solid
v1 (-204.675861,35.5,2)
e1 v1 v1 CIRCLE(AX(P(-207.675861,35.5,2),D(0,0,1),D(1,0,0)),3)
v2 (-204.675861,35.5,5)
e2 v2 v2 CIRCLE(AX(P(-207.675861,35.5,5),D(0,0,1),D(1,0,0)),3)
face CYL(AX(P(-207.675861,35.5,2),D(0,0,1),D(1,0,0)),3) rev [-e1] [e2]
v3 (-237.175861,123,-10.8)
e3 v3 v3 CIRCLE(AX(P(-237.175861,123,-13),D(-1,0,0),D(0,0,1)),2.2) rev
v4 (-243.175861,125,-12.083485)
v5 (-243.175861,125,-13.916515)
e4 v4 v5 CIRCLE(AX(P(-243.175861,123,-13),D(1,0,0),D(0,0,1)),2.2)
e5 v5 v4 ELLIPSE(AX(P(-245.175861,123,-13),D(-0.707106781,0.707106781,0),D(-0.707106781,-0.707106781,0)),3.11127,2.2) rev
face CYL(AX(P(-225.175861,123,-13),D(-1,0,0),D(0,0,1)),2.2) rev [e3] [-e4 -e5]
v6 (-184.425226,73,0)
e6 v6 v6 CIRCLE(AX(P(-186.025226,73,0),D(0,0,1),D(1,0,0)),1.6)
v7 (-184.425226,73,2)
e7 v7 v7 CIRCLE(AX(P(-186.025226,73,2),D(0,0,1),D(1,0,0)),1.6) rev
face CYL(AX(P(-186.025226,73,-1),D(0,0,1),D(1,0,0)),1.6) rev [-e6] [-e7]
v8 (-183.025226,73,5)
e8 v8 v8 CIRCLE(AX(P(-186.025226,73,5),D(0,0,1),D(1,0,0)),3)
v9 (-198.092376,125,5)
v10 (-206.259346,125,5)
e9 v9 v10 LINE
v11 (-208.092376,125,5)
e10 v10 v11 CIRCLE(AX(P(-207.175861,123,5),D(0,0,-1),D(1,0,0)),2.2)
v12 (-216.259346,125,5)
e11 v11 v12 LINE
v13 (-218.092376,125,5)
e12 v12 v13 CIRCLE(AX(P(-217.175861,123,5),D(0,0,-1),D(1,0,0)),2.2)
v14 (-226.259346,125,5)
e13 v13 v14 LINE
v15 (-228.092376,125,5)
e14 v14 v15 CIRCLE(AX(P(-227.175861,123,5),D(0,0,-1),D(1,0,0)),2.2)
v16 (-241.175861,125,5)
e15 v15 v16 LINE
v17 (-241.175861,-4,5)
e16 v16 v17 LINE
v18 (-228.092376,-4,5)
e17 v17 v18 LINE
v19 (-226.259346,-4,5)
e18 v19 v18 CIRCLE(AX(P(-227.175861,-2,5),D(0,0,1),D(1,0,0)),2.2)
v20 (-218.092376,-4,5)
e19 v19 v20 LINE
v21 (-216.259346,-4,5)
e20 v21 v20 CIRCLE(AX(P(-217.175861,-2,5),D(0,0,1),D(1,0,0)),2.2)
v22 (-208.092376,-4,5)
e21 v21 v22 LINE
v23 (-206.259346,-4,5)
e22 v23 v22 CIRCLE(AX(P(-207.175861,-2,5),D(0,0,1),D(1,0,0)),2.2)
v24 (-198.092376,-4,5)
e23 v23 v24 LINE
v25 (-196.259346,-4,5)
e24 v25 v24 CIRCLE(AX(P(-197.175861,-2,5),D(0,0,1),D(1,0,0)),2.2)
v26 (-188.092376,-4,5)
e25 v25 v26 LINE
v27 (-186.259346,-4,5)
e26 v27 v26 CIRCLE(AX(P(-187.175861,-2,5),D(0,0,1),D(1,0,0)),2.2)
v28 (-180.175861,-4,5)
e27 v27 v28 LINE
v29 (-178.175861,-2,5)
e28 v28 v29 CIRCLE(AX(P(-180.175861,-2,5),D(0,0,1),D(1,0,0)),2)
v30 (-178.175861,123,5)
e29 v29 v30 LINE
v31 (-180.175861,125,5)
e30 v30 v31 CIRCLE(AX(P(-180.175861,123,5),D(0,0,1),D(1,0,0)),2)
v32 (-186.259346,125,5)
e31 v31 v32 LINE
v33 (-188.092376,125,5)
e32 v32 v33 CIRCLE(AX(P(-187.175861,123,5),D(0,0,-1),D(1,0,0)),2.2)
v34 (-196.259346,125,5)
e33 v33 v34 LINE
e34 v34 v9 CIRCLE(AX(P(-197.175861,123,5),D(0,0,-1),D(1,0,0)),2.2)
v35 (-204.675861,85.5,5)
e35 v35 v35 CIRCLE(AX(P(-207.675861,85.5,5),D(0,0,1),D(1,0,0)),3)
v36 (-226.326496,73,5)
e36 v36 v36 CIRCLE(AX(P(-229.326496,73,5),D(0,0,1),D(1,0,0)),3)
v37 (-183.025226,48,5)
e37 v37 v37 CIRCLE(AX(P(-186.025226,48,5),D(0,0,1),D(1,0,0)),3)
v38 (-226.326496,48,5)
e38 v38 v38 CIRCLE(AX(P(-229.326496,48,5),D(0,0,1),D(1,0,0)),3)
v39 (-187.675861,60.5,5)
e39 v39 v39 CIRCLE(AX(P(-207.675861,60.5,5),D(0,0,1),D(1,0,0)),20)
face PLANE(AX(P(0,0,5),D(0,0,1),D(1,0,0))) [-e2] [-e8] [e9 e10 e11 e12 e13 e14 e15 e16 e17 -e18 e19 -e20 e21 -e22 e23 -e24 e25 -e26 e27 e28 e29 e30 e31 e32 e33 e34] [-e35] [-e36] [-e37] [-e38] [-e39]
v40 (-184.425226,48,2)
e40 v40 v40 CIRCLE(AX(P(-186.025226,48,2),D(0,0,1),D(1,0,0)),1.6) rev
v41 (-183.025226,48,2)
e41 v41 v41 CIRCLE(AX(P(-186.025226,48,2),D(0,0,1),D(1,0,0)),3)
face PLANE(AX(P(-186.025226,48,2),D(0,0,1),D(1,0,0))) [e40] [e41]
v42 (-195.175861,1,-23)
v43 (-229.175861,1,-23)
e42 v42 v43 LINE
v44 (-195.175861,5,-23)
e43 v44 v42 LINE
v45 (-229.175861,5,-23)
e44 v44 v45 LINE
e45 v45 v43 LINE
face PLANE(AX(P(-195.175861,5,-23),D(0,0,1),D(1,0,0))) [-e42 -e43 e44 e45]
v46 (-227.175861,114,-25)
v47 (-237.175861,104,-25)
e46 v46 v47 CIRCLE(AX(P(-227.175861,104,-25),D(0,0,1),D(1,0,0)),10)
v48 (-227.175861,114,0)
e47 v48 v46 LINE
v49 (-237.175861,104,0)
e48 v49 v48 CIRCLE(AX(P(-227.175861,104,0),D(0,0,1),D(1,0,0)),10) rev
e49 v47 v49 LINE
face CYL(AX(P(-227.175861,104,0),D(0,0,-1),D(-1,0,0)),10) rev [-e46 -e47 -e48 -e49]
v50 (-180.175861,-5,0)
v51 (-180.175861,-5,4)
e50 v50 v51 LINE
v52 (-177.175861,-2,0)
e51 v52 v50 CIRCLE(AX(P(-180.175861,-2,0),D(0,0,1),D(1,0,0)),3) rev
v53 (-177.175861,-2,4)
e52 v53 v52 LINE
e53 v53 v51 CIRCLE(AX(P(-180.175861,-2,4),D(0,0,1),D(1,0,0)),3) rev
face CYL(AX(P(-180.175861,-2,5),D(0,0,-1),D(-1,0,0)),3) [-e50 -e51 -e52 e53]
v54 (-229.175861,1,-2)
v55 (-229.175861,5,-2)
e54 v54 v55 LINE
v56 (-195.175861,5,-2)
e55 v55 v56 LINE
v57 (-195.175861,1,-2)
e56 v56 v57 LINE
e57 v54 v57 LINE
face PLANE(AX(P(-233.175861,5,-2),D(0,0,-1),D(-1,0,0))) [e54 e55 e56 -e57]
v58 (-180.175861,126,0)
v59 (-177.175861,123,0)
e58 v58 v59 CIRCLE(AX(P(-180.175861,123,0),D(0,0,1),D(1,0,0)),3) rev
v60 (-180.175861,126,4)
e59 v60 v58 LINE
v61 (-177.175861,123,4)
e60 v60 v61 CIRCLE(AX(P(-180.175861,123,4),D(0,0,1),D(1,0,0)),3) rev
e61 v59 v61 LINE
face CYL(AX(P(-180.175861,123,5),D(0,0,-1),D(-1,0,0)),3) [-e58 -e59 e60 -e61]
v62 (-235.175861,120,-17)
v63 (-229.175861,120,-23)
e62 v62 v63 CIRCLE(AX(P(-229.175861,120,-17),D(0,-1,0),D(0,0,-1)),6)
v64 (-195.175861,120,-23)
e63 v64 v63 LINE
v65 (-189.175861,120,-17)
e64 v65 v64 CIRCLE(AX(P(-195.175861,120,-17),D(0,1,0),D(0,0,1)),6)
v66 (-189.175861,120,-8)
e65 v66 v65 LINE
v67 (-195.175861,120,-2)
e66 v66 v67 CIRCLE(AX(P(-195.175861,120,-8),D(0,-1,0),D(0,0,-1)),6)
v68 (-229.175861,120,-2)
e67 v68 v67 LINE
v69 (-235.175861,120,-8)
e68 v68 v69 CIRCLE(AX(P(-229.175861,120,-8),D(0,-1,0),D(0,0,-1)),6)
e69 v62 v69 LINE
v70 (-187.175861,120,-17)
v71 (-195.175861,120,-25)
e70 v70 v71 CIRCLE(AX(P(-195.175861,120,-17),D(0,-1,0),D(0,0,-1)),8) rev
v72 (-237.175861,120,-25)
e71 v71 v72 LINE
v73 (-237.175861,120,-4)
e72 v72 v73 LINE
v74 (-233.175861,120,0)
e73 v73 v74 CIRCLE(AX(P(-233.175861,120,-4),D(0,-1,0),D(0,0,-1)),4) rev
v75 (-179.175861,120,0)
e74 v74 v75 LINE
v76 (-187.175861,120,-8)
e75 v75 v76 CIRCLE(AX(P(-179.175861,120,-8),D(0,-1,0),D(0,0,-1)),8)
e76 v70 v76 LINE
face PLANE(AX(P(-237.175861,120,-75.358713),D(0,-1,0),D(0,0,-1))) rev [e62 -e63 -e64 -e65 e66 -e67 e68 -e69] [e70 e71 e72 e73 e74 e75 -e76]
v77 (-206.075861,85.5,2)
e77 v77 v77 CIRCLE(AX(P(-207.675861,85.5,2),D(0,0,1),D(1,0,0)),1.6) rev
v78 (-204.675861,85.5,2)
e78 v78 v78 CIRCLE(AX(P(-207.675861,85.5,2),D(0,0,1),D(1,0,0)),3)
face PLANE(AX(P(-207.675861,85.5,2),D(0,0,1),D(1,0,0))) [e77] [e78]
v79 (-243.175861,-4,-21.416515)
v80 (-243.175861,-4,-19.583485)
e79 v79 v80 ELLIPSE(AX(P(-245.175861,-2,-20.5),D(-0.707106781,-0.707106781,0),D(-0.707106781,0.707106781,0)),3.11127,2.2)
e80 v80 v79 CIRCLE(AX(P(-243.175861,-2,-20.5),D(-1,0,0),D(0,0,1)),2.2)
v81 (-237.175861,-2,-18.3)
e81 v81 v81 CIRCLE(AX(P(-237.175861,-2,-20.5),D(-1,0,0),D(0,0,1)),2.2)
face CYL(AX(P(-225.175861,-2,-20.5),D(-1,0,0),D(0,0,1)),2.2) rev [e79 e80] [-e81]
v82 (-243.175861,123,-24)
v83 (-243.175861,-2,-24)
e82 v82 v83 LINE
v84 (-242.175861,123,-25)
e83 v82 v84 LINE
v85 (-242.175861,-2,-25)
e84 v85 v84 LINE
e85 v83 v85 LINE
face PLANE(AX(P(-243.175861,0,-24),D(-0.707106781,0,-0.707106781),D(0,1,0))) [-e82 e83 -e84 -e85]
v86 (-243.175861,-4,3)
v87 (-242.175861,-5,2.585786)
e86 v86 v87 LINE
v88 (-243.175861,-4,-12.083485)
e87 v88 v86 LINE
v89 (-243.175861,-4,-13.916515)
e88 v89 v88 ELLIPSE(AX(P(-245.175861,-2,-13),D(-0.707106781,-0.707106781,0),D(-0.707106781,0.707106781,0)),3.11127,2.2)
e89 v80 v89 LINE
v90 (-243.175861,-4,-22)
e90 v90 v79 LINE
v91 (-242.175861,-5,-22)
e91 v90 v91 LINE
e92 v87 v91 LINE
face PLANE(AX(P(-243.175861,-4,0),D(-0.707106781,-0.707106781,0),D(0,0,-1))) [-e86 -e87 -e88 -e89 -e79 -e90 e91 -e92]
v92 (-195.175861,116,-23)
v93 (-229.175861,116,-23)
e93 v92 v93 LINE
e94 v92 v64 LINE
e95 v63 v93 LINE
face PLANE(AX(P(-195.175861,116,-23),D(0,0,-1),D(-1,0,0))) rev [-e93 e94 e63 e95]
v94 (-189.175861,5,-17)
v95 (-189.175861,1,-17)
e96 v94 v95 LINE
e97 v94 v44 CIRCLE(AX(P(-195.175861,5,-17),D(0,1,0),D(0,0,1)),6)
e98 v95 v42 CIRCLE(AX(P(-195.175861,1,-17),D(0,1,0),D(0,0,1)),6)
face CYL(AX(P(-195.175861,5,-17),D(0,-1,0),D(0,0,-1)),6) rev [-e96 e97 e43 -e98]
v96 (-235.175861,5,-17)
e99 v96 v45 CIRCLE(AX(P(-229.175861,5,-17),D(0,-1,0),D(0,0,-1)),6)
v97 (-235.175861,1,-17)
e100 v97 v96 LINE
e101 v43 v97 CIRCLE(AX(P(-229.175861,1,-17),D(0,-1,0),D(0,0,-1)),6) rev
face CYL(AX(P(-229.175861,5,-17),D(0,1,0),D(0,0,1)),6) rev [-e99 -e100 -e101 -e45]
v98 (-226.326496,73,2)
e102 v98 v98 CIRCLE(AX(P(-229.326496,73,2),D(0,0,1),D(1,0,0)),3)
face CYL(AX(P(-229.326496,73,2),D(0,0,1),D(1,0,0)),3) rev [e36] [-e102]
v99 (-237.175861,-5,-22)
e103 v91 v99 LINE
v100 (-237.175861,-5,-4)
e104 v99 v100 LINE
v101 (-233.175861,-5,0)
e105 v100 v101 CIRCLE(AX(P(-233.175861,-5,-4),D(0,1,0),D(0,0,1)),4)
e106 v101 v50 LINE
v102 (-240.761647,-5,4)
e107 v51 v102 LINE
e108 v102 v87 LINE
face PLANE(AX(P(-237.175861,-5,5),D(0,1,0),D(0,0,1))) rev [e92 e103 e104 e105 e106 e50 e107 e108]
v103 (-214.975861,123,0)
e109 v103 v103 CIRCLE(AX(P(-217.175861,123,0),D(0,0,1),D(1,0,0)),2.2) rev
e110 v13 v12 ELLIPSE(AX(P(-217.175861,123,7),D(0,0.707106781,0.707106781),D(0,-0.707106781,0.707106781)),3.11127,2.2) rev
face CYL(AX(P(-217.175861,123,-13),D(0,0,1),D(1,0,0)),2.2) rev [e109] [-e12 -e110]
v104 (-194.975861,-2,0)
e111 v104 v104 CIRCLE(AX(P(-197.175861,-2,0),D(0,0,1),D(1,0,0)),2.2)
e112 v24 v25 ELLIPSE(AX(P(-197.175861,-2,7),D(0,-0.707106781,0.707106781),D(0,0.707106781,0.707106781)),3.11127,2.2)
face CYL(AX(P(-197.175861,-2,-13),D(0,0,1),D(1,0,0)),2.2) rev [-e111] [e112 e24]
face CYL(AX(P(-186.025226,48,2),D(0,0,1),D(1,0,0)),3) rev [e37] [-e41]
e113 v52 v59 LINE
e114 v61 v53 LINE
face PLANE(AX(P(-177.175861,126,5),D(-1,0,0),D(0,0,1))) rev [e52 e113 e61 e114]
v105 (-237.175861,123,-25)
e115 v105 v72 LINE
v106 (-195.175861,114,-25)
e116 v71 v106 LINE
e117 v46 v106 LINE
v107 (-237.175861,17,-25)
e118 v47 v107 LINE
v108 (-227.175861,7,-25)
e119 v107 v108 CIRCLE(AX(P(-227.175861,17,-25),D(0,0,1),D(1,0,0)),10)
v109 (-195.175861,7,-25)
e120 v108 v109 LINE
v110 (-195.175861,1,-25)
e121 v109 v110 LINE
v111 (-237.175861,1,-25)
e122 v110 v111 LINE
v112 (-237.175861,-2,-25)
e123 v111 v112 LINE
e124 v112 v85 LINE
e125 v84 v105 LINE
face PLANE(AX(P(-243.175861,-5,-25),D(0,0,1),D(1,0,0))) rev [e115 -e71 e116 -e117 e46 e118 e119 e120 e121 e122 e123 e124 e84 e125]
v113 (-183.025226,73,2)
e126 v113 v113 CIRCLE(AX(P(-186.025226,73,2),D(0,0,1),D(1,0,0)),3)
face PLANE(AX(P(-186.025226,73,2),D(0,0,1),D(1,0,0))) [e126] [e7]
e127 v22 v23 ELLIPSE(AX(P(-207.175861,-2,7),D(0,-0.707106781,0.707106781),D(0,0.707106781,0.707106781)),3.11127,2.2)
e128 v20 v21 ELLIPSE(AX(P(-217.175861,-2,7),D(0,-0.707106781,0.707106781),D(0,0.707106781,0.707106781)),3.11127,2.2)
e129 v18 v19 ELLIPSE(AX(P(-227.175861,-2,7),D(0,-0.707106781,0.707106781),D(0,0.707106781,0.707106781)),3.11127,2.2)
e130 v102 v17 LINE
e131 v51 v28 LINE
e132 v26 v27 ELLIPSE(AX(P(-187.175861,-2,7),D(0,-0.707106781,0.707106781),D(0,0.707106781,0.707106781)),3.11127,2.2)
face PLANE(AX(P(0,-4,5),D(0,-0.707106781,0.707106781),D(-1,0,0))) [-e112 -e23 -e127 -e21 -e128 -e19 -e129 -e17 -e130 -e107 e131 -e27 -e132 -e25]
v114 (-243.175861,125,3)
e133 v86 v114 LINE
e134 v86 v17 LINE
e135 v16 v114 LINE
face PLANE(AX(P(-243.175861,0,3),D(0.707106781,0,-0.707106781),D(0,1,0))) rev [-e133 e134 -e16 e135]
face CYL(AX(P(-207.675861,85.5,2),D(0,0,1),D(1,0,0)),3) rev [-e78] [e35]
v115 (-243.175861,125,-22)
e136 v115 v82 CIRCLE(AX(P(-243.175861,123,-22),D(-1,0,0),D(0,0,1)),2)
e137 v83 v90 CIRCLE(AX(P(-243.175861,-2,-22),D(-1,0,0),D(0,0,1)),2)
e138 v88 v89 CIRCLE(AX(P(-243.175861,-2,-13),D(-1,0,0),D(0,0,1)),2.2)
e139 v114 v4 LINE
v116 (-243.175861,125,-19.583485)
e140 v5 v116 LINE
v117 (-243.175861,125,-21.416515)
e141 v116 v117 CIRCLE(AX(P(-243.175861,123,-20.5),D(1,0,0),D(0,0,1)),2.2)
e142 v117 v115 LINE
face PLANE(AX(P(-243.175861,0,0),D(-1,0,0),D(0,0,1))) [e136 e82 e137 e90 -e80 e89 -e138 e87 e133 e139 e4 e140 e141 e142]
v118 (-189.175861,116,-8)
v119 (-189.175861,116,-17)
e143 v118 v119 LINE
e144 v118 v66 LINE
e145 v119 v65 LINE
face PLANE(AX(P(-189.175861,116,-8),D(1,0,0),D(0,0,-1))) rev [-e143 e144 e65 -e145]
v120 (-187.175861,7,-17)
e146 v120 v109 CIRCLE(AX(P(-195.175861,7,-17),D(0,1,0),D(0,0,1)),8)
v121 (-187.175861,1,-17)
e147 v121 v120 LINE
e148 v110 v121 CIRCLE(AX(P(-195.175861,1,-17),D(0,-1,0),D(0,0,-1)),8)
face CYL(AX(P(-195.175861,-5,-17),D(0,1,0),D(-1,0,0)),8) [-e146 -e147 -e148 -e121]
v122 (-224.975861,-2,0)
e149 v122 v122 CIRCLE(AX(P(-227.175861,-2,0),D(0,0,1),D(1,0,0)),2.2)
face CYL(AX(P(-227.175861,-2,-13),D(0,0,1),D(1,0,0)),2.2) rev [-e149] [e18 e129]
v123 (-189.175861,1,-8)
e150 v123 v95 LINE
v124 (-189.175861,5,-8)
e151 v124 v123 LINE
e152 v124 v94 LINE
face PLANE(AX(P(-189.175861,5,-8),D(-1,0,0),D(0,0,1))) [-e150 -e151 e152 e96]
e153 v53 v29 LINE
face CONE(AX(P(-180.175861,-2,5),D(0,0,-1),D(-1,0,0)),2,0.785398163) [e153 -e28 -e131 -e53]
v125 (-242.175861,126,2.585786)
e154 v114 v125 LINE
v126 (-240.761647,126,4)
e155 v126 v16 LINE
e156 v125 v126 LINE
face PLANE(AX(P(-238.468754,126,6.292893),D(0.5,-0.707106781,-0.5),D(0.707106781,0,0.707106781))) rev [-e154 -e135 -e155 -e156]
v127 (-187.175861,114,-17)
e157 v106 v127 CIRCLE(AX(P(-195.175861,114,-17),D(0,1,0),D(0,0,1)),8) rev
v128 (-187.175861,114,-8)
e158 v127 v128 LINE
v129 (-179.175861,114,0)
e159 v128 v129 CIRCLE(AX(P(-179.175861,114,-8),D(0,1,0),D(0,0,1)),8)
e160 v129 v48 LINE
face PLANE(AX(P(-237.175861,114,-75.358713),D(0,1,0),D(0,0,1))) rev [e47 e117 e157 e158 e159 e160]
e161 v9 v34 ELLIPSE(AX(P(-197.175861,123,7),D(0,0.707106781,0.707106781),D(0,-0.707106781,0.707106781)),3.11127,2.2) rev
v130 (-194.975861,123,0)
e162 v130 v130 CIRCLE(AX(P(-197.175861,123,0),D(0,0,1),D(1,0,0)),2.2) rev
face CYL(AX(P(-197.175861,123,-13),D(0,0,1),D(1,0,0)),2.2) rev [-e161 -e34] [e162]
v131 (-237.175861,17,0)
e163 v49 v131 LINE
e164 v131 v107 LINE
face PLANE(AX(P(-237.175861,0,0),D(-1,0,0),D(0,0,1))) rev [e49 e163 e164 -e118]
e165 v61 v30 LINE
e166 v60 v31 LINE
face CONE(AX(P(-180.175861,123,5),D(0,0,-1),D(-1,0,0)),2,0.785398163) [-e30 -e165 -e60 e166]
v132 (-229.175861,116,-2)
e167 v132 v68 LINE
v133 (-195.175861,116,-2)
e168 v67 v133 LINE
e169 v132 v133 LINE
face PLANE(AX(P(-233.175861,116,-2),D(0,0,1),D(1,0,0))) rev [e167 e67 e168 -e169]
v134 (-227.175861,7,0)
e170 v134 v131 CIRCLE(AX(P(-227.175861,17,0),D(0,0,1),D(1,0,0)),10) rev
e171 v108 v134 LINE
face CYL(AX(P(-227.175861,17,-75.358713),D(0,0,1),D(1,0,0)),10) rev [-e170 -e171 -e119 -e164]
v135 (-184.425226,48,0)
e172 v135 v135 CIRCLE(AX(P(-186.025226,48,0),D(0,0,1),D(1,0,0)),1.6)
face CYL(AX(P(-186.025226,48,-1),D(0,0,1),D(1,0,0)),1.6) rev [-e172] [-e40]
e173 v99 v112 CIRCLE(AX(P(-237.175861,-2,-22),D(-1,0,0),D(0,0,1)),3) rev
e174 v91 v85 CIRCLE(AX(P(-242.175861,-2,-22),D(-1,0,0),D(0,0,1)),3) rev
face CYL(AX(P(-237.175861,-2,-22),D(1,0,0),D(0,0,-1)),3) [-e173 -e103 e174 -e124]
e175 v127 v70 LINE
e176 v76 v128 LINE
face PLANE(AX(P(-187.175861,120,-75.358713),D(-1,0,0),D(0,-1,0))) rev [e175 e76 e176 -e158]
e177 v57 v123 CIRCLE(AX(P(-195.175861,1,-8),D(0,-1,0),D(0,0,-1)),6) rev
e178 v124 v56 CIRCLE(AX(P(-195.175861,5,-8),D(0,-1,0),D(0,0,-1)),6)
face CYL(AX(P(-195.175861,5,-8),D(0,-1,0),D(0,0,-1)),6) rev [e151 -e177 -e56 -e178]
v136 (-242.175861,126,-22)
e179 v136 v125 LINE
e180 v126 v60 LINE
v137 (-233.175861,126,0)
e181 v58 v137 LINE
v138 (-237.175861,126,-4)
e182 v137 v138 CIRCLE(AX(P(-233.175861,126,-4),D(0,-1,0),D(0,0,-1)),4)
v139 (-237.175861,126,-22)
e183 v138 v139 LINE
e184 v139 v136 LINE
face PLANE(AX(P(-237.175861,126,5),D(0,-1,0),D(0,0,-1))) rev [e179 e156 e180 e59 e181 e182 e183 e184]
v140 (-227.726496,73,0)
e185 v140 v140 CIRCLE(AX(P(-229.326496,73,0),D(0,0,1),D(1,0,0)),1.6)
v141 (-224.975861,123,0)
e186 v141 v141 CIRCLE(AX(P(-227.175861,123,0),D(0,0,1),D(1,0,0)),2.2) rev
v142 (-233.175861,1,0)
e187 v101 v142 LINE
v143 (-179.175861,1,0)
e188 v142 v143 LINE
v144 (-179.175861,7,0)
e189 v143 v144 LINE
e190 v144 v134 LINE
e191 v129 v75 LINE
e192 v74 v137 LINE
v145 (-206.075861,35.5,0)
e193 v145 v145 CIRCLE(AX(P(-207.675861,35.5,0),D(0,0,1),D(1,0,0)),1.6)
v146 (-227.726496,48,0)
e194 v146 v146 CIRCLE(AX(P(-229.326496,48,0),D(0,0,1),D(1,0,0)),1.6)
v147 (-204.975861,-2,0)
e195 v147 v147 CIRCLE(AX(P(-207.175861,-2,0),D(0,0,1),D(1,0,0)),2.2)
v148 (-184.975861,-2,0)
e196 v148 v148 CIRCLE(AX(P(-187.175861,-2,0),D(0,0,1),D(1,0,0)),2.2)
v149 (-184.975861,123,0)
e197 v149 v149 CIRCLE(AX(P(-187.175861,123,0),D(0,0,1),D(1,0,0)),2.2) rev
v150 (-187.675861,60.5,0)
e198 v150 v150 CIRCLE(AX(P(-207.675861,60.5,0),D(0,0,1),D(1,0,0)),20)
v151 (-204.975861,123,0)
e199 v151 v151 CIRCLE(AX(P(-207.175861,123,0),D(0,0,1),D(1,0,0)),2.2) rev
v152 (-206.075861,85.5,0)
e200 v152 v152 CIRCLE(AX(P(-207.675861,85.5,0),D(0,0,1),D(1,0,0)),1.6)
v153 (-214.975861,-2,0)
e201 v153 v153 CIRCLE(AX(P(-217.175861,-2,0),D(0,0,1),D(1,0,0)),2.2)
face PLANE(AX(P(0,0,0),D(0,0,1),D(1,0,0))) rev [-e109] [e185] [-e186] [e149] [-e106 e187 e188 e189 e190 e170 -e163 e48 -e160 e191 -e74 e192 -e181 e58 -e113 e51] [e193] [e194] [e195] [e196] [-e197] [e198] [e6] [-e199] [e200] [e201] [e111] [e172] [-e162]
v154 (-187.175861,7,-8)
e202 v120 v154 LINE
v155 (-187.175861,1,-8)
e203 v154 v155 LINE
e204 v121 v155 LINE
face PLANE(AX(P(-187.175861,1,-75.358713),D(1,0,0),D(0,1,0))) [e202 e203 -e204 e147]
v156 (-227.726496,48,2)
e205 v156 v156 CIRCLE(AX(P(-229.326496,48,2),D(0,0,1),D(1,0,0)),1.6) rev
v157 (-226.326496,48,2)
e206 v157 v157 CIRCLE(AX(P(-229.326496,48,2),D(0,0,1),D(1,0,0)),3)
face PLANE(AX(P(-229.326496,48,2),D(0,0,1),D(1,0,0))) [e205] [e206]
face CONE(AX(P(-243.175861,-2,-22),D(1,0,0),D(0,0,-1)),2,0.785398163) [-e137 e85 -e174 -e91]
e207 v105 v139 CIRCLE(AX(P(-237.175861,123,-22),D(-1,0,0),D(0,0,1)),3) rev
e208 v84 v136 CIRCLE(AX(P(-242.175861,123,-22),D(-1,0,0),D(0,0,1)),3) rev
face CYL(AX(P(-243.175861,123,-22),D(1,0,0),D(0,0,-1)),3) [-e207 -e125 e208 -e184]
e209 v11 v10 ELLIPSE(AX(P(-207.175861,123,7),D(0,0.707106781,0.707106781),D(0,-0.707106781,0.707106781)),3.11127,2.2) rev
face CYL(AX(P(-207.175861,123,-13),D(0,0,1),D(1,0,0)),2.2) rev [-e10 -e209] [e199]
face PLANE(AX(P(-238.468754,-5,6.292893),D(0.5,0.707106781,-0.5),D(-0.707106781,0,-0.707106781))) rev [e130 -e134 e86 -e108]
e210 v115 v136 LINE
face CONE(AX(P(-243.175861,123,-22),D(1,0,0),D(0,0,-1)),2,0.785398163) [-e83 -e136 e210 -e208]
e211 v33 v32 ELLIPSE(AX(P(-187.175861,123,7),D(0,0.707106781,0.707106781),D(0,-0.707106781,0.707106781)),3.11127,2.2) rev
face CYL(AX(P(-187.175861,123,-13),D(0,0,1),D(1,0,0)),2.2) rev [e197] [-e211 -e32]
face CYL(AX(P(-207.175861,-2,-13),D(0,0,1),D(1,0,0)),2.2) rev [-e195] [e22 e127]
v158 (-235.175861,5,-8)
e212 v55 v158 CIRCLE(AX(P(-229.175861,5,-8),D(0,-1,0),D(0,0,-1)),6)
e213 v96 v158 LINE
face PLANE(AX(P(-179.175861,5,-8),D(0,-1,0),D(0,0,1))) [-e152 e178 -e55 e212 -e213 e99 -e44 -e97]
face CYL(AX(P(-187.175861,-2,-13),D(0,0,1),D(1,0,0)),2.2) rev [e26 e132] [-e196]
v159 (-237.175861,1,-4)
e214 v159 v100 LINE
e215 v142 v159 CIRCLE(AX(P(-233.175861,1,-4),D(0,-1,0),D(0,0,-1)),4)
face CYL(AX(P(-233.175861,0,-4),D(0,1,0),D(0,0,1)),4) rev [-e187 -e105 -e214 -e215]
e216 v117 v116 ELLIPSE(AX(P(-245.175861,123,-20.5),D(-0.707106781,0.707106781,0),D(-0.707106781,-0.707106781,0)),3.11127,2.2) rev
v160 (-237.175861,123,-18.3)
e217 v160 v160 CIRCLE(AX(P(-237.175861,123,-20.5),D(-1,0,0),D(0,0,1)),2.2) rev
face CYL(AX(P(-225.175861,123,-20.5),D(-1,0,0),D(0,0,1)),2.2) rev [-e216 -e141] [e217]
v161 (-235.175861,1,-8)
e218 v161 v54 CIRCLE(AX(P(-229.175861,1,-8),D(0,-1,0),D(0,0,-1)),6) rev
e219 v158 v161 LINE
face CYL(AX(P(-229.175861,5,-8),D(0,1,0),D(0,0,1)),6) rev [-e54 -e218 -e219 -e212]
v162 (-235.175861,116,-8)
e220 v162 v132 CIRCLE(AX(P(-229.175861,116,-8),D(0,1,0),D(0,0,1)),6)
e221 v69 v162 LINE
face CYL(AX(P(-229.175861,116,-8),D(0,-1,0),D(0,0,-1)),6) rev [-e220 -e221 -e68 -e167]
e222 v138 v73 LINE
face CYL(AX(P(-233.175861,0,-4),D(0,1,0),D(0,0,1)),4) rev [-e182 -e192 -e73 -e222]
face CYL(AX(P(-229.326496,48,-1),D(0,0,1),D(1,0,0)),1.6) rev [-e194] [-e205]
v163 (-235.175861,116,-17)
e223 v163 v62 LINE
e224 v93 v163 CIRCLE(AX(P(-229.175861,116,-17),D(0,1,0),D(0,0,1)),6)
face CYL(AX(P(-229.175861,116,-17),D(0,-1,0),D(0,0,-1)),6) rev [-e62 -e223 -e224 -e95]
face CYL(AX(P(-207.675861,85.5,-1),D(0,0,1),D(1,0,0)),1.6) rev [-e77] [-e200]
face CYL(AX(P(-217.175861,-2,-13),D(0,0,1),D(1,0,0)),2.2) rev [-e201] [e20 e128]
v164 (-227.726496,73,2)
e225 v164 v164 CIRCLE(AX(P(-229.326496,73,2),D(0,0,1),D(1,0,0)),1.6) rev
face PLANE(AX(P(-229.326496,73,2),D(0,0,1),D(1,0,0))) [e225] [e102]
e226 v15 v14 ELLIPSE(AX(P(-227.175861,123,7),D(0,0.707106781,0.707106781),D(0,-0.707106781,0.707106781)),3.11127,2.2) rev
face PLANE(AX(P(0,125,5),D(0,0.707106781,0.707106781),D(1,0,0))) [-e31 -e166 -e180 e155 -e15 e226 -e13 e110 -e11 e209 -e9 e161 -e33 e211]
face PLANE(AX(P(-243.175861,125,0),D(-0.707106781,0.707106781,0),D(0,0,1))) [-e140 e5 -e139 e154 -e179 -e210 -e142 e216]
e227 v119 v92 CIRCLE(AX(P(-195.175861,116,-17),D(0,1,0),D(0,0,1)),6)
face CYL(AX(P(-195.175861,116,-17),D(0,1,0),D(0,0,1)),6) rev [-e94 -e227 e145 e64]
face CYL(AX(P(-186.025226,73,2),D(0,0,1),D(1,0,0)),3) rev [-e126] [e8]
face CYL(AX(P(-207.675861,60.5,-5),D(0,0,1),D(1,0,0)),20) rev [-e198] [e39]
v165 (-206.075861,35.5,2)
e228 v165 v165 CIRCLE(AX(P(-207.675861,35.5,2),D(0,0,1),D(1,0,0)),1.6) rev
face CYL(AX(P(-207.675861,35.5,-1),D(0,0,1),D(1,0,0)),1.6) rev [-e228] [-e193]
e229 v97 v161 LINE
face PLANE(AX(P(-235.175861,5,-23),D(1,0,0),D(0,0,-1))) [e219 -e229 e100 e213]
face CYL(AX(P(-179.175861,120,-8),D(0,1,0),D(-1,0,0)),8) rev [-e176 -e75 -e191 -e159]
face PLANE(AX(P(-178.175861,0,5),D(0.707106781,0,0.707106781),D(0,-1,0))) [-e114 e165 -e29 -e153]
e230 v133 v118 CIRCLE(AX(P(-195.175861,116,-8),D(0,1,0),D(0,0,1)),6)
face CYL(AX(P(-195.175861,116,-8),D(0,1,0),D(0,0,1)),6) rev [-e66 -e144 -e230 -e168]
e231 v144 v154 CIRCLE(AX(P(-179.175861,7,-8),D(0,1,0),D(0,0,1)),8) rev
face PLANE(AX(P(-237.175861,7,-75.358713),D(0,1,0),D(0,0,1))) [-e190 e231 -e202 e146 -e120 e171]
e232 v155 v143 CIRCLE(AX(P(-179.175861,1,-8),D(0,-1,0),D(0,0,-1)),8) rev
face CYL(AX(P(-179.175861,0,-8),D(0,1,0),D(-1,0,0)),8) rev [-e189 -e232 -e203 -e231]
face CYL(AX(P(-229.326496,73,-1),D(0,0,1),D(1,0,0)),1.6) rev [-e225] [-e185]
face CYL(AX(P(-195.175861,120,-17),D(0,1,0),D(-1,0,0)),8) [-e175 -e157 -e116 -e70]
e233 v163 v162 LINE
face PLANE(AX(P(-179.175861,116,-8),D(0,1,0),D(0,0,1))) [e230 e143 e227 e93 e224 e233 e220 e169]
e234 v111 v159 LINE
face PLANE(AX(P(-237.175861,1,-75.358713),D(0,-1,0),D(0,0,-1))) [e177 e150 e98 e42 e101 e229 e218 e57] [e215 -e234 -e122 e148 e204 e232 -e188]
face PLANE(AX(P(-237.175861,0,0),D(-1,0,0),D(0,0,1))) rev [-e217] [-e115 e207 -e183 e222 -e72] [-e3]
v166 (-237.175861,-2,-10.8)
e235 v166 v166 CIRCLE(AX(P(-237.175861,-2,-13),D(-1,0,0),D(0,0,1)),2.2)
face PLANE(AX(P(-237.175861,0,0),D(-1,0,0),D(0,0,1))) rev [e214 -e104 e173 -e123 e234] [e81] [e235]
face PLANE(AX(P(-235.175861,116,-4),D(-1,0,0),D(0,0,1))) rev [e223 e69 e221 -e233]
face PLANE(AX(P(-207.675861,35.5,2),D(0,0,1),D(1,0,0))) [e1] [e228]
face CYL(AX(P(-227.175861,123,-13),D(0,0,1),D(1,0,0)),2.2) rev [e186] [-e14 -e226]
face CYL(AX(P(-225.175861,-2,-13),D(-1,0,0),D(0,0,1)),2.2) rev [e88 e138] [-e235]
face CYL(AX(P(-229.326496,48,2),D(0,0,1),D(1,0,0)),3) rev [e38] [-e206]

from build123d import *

# Parameters (mm, degrees)
SKETCH_1_W          = 60
SKETCH_1_H          = 131
EXTRUDE_1_DEPTH     = 5
SKETCH_2_W          = 30
SKETCH_2_H          = 131
EXTRUDE_2_DEPTH     = 6
SKETCH_3_R          = 20
CUT_EXTRUDE_1_DEPTH = 10
CHAMFER_1_SIZE      = 2
FILLET_1_R          = 3
SKETCH_13_R         = 1.6
CUT_EXTRUDE_2_DEPTH = 6
SKETCH_14_R         = 3
CUT_EXTRUDE_3_DEPTH = 3
CHAMFER_4_SIZE      = 1
SKETCH_16_W         = 50
SKETCH_16_H         = 6
EXTRUDE_4_DEPTH     = 25
FILLET_3_R          = 4
FILLET_4_R          = 10
FILLET_5_R          = 8
CUT_EXTRUDE_4_DEPTH = 4
FILLET_6_R          = 6
SKETCH_19_R         = 2.2
CUT_EXTRUDE_5_DEPTH = 18
SKETCH_20_R         = 2.2
CUT_EXTRUDE_6_DEPTH = 18


with BuildPart() as part:
    # 草图1 → 凸台-拉伸1 (new body)
    with BuildSketch(Plane.XY):
        with Locations((-207.175860782, 60.5)):
            Rectangle(SKETCH_1_W, SKETCH_1_H)
    extrude(amount=EXTRUDE_1_DEPTH)

    # 草图2 → 凸台-拉伸2 (add)
    with BuildSketch(Plane.ZY.offset(237.175860782)):
        with Locations((-10, 60.5)):
            Rectangle(SKETCH_2_W, SKETCH_2_H)
    extrude(amount=EXTRUDE_2_DEPTH)

    # 草图3 → 切除-拉伸1 (cut)
    with BuildSketch(Plane.XY.offset(5)):
        with Locations((-207.675860782, 60.5)):
            Circle(SKETCH_3_R)
    extrude(amount=-CUT_EXTRUDE_1_DEPTH, mode=Mode.SUBTRACT)

    # 倒角1
    chamfer_1_edges = [part.edges().sort_by_distance(p)[0] for p in [
        (-243.175860782, 60.5, 5),
    ]]
    chamfer(chamfer_1_edges, length=CHAMFER_1_SIZE)

    # 圆角1
    fillet_1_edges = [part.edges().sort_by_distance(p)[0] for p in [
        (-240.175860782, 126, -25),
        (-240.175860782, -5, -25),
        (-177.175860782, 126, 2.5),
        (-177.175860782, -5, 2.5),
    ]]
    fillet(fillet_1_edges, radius=FILLET_1_R)

    # 草图13 → 切除-拉伸2 (cut)
    with BuildSketch(Plane.XY.offset(5)):
        with Locations((-207.675860782, 85.5)):
            Circle(SKETCH_13_R)
        with Locations((-229.326495877, 73)):
            Circle(SKETCH_13_R)
        with Locations((-186.025225688, 73)):
            Circle(SKETCH_13_R)
        with Locations((-186.025225688, 48)):
            Circle(SKETCH_13_R)
        with Locations((-207.675860782, 35.5)):
            Circle(SKETCH_13_R)
        with Locations((-229.326495877, 48)):
            Circle(SKETCH_13_R)
    extrude(amount=-CUT_EXTRUDE_2_DEPTH, mode=Mode.SUBTRACT)

    # 草图14 → 切除-拉伸3 (cut)
    with BuildSketch(Plane.XY.offset(5)):
        with Locations((-207.675860782, 85.5)):
            Circle(SKETCH_14_R)
        with Locations((-186.025225688, 73)):
            Circle(SKETCH_14_R)
        with Locations((-186.025225688, 48)):
            Circle(SKETCH_14_R)
        with Locations((-207.675860782, 35.5)):
            Circle(SKETCH_14_R)
        with Locations((-229.326495877, 48)):
            Circle(SKETCH_14_R)
        with Locations((-229.326495877, 73)):
            Circle(SKETCH_14_R)
    extrude(amount=-CUT_EXTRUDE_3_DEPTH, mode=Mode.SUBTRACT)

    # 倒角4
    chamfer_4_edges = [part.edges().sort_by_distance(p)[0] for p in [
        (-243.175860782, 126, -9.5),
        (-242.175860782, 126, 4),
        (-210.675860782, -5, 5),
        (-242.175860782, -5, 4),
        (-243.175860782, 60.5, -25),
        (-210.675860782, 126, 5),
        (-243.175860782, -5, -9.5),
        (-243.175860782, -4.121320344, -24.121320344),
        (-243.175860782, 125.121320344, -24.121320344),
        (-177.175860782, 60.5, 5),
        (-178.054540439, -4.121320344, 5),
        (-178.054540439, 125.121320344, 5),
    ]]
    chamfer(chamfer_4_edges, length=CHAMFER_4_SIZE)

    # 草图16 → 凸台-拉伸4 (add)
    with BuildSketch(Plane(origin=(0, 0, 0), x_dir=(-1, 0, 0), z_dir=(0, 0, -1))):
        with Locations((212.175860782, 117)):
            Rectangle(SKETCH_16_W, SKETCH_16_H)
    extrude_4 = extrude(amount=EXTRUDE_4_DEPTH)

    # 镜向1: 凸台-拉伸4 across plane
    add(extrude_4.mirror(Plane(origin=(0, 60.5, 0), x_dir=(0, 0, 1), z_dir=(0, -1, 0))))

    # 圆角3
    fillet_3_edges = [part.edges().sort_by_distance(p)[0] for p in [
        (-237.175860782, -2, 0),
        (-237.175860782, 123, 0),
    ]]
    fillet(fillet_3_edges, radius=FILLET_3_R)

    # 圆角4
    fillet_4_edges = [part.edges().sort_by_distance(p)[0] for p in [
        (-237.175860782, 114, -12.5),
        (-237.175860782, 7, -12.5),
    ]]
    fillet(fillet_4_edges, radius=FILLET_4_R)

    # 圆角5
    fillet_5_edges = [part.edges().sort_by_distance(p)[0] for p in [
        (-187.175860782, 117, -25),
        (-187.175860782, 117, 0),
        (-187.175860782, 4, 0),
        (-187.175860782, 4, -25),
    ]]
    fillet(fillet_5_edges, radius=FILLET_5_R)

    # 草图17 → 切除-拉伸4 (cut)
    with BuildSketch(Plane(origin=(0, 120, 0), x_dir=(1, 0, 0), z_dir=(0, 1, 0))):
        with BuildLine():
            Line((-235.175860782, 4), (-235.175860782, 2))
            Line((-235.175860782, 2), (-233.175860782, 2))
            Line((-233.175860782, 2), (-187.175860782, 2))
            ThreePointArc((-187.175860782, 2), (-188.662693763, 4.83772234), (-189.175860782, 8))
            Line((-189.175860782, 8), (-189.175860782, 17))
            ThreePointArc((-189.175860782, 17), (-190.933220095, 21.242640687), (-195.175860782, 23))
            Line((-195.175860782, 23), (-235.175860782, 23))
            Line((-235.175860782, 23), (-235.175860782, 4))
        make_face()
    cut_extrude_4 = extrude(amount=-CUT_EXTRUDE_4_DEPTH, mode=Mode.SUBTRACT)

    # 镜向2: 切除-拉伸4 across plane
    add(cut_extrude_4.mirror(Plane(origin=(0, 60.5, 0), x_dir=(0, 0, 1), z_dir=(0, -1, 0))), mode=Mode.SUBTRACT)

    # 圆角6
    fillet_6_edges = [part.edges().sort_by_distance(p)[0] for p in [
        (-187.175860782, 118, -2),
        (-235.175860782, 118, -23),
        (-235.175860782, 118, -2),
        (-235.175860782, 3, -23),
        (-187.175860782, 3, -2),
        (-235.175860782, 3, -2),
    ]]
    fillet(fillet_6_edges, radius=FILLET_6_R - 0.0001)  # a hair under: the kernel refuses the full size

    # 草图19 → 切除-拉伸5 (cut)
    with BuildSketch(Plane.XY.offset(5)):
        with Locations((-217.175860782, -2)):
            Circle(SKETCH_19_R)
        with Locations((-187.175860782, -2)):
            Circle(SKETCH_19_R)
        with Locations((-197.175860782, -2)):
            Circle(SKETCH_19_R)
        with Locations((-207.175860782, -2)):
            Circle(SKETCH_19_R)
        with Locations((-227.175860782, -2)):
            Circle(SKETCH_19_R)
    cut_extrude_5 = extrude(amount=-CUT_EXTRUDE_5_DEPTH, mode=Mode.SUBTRACT)

    # 镜向3: 切除-拉伸5 across plane
    add(cut_extrude_5.mirror(Plane(origin=(0, 60.5, 0), x_dir=(0, 0, 1), z_dir=(0, -1, 0))), mode=Mode.SUBTRACT)

    # 草图20 → 切除-拉伸6 (cut)
    with BuildSketch(Plane.ZY.offset(243.175860782)):
        with Locations((-20.5, -2)):
            Circle(SKETCH_20_R)
        with Locations((-13, -2)):
            Circle(SKETCH_20_R)
    cut_extrude_6 = extrude(amount=-CUT_EXTRUDE_6_DEPTH, mode=Mode.SUBTRACT)

    # 镜向4: 切除-拉伸6 across plane
    add(cut_extrude_6.mirror(Plane(origin=(0, 60.5, 0), x_dir=(0, 0, 1), z_dir=(0, -1, 0))), mode=Mode.SUBTRACT)


solid = part.part
